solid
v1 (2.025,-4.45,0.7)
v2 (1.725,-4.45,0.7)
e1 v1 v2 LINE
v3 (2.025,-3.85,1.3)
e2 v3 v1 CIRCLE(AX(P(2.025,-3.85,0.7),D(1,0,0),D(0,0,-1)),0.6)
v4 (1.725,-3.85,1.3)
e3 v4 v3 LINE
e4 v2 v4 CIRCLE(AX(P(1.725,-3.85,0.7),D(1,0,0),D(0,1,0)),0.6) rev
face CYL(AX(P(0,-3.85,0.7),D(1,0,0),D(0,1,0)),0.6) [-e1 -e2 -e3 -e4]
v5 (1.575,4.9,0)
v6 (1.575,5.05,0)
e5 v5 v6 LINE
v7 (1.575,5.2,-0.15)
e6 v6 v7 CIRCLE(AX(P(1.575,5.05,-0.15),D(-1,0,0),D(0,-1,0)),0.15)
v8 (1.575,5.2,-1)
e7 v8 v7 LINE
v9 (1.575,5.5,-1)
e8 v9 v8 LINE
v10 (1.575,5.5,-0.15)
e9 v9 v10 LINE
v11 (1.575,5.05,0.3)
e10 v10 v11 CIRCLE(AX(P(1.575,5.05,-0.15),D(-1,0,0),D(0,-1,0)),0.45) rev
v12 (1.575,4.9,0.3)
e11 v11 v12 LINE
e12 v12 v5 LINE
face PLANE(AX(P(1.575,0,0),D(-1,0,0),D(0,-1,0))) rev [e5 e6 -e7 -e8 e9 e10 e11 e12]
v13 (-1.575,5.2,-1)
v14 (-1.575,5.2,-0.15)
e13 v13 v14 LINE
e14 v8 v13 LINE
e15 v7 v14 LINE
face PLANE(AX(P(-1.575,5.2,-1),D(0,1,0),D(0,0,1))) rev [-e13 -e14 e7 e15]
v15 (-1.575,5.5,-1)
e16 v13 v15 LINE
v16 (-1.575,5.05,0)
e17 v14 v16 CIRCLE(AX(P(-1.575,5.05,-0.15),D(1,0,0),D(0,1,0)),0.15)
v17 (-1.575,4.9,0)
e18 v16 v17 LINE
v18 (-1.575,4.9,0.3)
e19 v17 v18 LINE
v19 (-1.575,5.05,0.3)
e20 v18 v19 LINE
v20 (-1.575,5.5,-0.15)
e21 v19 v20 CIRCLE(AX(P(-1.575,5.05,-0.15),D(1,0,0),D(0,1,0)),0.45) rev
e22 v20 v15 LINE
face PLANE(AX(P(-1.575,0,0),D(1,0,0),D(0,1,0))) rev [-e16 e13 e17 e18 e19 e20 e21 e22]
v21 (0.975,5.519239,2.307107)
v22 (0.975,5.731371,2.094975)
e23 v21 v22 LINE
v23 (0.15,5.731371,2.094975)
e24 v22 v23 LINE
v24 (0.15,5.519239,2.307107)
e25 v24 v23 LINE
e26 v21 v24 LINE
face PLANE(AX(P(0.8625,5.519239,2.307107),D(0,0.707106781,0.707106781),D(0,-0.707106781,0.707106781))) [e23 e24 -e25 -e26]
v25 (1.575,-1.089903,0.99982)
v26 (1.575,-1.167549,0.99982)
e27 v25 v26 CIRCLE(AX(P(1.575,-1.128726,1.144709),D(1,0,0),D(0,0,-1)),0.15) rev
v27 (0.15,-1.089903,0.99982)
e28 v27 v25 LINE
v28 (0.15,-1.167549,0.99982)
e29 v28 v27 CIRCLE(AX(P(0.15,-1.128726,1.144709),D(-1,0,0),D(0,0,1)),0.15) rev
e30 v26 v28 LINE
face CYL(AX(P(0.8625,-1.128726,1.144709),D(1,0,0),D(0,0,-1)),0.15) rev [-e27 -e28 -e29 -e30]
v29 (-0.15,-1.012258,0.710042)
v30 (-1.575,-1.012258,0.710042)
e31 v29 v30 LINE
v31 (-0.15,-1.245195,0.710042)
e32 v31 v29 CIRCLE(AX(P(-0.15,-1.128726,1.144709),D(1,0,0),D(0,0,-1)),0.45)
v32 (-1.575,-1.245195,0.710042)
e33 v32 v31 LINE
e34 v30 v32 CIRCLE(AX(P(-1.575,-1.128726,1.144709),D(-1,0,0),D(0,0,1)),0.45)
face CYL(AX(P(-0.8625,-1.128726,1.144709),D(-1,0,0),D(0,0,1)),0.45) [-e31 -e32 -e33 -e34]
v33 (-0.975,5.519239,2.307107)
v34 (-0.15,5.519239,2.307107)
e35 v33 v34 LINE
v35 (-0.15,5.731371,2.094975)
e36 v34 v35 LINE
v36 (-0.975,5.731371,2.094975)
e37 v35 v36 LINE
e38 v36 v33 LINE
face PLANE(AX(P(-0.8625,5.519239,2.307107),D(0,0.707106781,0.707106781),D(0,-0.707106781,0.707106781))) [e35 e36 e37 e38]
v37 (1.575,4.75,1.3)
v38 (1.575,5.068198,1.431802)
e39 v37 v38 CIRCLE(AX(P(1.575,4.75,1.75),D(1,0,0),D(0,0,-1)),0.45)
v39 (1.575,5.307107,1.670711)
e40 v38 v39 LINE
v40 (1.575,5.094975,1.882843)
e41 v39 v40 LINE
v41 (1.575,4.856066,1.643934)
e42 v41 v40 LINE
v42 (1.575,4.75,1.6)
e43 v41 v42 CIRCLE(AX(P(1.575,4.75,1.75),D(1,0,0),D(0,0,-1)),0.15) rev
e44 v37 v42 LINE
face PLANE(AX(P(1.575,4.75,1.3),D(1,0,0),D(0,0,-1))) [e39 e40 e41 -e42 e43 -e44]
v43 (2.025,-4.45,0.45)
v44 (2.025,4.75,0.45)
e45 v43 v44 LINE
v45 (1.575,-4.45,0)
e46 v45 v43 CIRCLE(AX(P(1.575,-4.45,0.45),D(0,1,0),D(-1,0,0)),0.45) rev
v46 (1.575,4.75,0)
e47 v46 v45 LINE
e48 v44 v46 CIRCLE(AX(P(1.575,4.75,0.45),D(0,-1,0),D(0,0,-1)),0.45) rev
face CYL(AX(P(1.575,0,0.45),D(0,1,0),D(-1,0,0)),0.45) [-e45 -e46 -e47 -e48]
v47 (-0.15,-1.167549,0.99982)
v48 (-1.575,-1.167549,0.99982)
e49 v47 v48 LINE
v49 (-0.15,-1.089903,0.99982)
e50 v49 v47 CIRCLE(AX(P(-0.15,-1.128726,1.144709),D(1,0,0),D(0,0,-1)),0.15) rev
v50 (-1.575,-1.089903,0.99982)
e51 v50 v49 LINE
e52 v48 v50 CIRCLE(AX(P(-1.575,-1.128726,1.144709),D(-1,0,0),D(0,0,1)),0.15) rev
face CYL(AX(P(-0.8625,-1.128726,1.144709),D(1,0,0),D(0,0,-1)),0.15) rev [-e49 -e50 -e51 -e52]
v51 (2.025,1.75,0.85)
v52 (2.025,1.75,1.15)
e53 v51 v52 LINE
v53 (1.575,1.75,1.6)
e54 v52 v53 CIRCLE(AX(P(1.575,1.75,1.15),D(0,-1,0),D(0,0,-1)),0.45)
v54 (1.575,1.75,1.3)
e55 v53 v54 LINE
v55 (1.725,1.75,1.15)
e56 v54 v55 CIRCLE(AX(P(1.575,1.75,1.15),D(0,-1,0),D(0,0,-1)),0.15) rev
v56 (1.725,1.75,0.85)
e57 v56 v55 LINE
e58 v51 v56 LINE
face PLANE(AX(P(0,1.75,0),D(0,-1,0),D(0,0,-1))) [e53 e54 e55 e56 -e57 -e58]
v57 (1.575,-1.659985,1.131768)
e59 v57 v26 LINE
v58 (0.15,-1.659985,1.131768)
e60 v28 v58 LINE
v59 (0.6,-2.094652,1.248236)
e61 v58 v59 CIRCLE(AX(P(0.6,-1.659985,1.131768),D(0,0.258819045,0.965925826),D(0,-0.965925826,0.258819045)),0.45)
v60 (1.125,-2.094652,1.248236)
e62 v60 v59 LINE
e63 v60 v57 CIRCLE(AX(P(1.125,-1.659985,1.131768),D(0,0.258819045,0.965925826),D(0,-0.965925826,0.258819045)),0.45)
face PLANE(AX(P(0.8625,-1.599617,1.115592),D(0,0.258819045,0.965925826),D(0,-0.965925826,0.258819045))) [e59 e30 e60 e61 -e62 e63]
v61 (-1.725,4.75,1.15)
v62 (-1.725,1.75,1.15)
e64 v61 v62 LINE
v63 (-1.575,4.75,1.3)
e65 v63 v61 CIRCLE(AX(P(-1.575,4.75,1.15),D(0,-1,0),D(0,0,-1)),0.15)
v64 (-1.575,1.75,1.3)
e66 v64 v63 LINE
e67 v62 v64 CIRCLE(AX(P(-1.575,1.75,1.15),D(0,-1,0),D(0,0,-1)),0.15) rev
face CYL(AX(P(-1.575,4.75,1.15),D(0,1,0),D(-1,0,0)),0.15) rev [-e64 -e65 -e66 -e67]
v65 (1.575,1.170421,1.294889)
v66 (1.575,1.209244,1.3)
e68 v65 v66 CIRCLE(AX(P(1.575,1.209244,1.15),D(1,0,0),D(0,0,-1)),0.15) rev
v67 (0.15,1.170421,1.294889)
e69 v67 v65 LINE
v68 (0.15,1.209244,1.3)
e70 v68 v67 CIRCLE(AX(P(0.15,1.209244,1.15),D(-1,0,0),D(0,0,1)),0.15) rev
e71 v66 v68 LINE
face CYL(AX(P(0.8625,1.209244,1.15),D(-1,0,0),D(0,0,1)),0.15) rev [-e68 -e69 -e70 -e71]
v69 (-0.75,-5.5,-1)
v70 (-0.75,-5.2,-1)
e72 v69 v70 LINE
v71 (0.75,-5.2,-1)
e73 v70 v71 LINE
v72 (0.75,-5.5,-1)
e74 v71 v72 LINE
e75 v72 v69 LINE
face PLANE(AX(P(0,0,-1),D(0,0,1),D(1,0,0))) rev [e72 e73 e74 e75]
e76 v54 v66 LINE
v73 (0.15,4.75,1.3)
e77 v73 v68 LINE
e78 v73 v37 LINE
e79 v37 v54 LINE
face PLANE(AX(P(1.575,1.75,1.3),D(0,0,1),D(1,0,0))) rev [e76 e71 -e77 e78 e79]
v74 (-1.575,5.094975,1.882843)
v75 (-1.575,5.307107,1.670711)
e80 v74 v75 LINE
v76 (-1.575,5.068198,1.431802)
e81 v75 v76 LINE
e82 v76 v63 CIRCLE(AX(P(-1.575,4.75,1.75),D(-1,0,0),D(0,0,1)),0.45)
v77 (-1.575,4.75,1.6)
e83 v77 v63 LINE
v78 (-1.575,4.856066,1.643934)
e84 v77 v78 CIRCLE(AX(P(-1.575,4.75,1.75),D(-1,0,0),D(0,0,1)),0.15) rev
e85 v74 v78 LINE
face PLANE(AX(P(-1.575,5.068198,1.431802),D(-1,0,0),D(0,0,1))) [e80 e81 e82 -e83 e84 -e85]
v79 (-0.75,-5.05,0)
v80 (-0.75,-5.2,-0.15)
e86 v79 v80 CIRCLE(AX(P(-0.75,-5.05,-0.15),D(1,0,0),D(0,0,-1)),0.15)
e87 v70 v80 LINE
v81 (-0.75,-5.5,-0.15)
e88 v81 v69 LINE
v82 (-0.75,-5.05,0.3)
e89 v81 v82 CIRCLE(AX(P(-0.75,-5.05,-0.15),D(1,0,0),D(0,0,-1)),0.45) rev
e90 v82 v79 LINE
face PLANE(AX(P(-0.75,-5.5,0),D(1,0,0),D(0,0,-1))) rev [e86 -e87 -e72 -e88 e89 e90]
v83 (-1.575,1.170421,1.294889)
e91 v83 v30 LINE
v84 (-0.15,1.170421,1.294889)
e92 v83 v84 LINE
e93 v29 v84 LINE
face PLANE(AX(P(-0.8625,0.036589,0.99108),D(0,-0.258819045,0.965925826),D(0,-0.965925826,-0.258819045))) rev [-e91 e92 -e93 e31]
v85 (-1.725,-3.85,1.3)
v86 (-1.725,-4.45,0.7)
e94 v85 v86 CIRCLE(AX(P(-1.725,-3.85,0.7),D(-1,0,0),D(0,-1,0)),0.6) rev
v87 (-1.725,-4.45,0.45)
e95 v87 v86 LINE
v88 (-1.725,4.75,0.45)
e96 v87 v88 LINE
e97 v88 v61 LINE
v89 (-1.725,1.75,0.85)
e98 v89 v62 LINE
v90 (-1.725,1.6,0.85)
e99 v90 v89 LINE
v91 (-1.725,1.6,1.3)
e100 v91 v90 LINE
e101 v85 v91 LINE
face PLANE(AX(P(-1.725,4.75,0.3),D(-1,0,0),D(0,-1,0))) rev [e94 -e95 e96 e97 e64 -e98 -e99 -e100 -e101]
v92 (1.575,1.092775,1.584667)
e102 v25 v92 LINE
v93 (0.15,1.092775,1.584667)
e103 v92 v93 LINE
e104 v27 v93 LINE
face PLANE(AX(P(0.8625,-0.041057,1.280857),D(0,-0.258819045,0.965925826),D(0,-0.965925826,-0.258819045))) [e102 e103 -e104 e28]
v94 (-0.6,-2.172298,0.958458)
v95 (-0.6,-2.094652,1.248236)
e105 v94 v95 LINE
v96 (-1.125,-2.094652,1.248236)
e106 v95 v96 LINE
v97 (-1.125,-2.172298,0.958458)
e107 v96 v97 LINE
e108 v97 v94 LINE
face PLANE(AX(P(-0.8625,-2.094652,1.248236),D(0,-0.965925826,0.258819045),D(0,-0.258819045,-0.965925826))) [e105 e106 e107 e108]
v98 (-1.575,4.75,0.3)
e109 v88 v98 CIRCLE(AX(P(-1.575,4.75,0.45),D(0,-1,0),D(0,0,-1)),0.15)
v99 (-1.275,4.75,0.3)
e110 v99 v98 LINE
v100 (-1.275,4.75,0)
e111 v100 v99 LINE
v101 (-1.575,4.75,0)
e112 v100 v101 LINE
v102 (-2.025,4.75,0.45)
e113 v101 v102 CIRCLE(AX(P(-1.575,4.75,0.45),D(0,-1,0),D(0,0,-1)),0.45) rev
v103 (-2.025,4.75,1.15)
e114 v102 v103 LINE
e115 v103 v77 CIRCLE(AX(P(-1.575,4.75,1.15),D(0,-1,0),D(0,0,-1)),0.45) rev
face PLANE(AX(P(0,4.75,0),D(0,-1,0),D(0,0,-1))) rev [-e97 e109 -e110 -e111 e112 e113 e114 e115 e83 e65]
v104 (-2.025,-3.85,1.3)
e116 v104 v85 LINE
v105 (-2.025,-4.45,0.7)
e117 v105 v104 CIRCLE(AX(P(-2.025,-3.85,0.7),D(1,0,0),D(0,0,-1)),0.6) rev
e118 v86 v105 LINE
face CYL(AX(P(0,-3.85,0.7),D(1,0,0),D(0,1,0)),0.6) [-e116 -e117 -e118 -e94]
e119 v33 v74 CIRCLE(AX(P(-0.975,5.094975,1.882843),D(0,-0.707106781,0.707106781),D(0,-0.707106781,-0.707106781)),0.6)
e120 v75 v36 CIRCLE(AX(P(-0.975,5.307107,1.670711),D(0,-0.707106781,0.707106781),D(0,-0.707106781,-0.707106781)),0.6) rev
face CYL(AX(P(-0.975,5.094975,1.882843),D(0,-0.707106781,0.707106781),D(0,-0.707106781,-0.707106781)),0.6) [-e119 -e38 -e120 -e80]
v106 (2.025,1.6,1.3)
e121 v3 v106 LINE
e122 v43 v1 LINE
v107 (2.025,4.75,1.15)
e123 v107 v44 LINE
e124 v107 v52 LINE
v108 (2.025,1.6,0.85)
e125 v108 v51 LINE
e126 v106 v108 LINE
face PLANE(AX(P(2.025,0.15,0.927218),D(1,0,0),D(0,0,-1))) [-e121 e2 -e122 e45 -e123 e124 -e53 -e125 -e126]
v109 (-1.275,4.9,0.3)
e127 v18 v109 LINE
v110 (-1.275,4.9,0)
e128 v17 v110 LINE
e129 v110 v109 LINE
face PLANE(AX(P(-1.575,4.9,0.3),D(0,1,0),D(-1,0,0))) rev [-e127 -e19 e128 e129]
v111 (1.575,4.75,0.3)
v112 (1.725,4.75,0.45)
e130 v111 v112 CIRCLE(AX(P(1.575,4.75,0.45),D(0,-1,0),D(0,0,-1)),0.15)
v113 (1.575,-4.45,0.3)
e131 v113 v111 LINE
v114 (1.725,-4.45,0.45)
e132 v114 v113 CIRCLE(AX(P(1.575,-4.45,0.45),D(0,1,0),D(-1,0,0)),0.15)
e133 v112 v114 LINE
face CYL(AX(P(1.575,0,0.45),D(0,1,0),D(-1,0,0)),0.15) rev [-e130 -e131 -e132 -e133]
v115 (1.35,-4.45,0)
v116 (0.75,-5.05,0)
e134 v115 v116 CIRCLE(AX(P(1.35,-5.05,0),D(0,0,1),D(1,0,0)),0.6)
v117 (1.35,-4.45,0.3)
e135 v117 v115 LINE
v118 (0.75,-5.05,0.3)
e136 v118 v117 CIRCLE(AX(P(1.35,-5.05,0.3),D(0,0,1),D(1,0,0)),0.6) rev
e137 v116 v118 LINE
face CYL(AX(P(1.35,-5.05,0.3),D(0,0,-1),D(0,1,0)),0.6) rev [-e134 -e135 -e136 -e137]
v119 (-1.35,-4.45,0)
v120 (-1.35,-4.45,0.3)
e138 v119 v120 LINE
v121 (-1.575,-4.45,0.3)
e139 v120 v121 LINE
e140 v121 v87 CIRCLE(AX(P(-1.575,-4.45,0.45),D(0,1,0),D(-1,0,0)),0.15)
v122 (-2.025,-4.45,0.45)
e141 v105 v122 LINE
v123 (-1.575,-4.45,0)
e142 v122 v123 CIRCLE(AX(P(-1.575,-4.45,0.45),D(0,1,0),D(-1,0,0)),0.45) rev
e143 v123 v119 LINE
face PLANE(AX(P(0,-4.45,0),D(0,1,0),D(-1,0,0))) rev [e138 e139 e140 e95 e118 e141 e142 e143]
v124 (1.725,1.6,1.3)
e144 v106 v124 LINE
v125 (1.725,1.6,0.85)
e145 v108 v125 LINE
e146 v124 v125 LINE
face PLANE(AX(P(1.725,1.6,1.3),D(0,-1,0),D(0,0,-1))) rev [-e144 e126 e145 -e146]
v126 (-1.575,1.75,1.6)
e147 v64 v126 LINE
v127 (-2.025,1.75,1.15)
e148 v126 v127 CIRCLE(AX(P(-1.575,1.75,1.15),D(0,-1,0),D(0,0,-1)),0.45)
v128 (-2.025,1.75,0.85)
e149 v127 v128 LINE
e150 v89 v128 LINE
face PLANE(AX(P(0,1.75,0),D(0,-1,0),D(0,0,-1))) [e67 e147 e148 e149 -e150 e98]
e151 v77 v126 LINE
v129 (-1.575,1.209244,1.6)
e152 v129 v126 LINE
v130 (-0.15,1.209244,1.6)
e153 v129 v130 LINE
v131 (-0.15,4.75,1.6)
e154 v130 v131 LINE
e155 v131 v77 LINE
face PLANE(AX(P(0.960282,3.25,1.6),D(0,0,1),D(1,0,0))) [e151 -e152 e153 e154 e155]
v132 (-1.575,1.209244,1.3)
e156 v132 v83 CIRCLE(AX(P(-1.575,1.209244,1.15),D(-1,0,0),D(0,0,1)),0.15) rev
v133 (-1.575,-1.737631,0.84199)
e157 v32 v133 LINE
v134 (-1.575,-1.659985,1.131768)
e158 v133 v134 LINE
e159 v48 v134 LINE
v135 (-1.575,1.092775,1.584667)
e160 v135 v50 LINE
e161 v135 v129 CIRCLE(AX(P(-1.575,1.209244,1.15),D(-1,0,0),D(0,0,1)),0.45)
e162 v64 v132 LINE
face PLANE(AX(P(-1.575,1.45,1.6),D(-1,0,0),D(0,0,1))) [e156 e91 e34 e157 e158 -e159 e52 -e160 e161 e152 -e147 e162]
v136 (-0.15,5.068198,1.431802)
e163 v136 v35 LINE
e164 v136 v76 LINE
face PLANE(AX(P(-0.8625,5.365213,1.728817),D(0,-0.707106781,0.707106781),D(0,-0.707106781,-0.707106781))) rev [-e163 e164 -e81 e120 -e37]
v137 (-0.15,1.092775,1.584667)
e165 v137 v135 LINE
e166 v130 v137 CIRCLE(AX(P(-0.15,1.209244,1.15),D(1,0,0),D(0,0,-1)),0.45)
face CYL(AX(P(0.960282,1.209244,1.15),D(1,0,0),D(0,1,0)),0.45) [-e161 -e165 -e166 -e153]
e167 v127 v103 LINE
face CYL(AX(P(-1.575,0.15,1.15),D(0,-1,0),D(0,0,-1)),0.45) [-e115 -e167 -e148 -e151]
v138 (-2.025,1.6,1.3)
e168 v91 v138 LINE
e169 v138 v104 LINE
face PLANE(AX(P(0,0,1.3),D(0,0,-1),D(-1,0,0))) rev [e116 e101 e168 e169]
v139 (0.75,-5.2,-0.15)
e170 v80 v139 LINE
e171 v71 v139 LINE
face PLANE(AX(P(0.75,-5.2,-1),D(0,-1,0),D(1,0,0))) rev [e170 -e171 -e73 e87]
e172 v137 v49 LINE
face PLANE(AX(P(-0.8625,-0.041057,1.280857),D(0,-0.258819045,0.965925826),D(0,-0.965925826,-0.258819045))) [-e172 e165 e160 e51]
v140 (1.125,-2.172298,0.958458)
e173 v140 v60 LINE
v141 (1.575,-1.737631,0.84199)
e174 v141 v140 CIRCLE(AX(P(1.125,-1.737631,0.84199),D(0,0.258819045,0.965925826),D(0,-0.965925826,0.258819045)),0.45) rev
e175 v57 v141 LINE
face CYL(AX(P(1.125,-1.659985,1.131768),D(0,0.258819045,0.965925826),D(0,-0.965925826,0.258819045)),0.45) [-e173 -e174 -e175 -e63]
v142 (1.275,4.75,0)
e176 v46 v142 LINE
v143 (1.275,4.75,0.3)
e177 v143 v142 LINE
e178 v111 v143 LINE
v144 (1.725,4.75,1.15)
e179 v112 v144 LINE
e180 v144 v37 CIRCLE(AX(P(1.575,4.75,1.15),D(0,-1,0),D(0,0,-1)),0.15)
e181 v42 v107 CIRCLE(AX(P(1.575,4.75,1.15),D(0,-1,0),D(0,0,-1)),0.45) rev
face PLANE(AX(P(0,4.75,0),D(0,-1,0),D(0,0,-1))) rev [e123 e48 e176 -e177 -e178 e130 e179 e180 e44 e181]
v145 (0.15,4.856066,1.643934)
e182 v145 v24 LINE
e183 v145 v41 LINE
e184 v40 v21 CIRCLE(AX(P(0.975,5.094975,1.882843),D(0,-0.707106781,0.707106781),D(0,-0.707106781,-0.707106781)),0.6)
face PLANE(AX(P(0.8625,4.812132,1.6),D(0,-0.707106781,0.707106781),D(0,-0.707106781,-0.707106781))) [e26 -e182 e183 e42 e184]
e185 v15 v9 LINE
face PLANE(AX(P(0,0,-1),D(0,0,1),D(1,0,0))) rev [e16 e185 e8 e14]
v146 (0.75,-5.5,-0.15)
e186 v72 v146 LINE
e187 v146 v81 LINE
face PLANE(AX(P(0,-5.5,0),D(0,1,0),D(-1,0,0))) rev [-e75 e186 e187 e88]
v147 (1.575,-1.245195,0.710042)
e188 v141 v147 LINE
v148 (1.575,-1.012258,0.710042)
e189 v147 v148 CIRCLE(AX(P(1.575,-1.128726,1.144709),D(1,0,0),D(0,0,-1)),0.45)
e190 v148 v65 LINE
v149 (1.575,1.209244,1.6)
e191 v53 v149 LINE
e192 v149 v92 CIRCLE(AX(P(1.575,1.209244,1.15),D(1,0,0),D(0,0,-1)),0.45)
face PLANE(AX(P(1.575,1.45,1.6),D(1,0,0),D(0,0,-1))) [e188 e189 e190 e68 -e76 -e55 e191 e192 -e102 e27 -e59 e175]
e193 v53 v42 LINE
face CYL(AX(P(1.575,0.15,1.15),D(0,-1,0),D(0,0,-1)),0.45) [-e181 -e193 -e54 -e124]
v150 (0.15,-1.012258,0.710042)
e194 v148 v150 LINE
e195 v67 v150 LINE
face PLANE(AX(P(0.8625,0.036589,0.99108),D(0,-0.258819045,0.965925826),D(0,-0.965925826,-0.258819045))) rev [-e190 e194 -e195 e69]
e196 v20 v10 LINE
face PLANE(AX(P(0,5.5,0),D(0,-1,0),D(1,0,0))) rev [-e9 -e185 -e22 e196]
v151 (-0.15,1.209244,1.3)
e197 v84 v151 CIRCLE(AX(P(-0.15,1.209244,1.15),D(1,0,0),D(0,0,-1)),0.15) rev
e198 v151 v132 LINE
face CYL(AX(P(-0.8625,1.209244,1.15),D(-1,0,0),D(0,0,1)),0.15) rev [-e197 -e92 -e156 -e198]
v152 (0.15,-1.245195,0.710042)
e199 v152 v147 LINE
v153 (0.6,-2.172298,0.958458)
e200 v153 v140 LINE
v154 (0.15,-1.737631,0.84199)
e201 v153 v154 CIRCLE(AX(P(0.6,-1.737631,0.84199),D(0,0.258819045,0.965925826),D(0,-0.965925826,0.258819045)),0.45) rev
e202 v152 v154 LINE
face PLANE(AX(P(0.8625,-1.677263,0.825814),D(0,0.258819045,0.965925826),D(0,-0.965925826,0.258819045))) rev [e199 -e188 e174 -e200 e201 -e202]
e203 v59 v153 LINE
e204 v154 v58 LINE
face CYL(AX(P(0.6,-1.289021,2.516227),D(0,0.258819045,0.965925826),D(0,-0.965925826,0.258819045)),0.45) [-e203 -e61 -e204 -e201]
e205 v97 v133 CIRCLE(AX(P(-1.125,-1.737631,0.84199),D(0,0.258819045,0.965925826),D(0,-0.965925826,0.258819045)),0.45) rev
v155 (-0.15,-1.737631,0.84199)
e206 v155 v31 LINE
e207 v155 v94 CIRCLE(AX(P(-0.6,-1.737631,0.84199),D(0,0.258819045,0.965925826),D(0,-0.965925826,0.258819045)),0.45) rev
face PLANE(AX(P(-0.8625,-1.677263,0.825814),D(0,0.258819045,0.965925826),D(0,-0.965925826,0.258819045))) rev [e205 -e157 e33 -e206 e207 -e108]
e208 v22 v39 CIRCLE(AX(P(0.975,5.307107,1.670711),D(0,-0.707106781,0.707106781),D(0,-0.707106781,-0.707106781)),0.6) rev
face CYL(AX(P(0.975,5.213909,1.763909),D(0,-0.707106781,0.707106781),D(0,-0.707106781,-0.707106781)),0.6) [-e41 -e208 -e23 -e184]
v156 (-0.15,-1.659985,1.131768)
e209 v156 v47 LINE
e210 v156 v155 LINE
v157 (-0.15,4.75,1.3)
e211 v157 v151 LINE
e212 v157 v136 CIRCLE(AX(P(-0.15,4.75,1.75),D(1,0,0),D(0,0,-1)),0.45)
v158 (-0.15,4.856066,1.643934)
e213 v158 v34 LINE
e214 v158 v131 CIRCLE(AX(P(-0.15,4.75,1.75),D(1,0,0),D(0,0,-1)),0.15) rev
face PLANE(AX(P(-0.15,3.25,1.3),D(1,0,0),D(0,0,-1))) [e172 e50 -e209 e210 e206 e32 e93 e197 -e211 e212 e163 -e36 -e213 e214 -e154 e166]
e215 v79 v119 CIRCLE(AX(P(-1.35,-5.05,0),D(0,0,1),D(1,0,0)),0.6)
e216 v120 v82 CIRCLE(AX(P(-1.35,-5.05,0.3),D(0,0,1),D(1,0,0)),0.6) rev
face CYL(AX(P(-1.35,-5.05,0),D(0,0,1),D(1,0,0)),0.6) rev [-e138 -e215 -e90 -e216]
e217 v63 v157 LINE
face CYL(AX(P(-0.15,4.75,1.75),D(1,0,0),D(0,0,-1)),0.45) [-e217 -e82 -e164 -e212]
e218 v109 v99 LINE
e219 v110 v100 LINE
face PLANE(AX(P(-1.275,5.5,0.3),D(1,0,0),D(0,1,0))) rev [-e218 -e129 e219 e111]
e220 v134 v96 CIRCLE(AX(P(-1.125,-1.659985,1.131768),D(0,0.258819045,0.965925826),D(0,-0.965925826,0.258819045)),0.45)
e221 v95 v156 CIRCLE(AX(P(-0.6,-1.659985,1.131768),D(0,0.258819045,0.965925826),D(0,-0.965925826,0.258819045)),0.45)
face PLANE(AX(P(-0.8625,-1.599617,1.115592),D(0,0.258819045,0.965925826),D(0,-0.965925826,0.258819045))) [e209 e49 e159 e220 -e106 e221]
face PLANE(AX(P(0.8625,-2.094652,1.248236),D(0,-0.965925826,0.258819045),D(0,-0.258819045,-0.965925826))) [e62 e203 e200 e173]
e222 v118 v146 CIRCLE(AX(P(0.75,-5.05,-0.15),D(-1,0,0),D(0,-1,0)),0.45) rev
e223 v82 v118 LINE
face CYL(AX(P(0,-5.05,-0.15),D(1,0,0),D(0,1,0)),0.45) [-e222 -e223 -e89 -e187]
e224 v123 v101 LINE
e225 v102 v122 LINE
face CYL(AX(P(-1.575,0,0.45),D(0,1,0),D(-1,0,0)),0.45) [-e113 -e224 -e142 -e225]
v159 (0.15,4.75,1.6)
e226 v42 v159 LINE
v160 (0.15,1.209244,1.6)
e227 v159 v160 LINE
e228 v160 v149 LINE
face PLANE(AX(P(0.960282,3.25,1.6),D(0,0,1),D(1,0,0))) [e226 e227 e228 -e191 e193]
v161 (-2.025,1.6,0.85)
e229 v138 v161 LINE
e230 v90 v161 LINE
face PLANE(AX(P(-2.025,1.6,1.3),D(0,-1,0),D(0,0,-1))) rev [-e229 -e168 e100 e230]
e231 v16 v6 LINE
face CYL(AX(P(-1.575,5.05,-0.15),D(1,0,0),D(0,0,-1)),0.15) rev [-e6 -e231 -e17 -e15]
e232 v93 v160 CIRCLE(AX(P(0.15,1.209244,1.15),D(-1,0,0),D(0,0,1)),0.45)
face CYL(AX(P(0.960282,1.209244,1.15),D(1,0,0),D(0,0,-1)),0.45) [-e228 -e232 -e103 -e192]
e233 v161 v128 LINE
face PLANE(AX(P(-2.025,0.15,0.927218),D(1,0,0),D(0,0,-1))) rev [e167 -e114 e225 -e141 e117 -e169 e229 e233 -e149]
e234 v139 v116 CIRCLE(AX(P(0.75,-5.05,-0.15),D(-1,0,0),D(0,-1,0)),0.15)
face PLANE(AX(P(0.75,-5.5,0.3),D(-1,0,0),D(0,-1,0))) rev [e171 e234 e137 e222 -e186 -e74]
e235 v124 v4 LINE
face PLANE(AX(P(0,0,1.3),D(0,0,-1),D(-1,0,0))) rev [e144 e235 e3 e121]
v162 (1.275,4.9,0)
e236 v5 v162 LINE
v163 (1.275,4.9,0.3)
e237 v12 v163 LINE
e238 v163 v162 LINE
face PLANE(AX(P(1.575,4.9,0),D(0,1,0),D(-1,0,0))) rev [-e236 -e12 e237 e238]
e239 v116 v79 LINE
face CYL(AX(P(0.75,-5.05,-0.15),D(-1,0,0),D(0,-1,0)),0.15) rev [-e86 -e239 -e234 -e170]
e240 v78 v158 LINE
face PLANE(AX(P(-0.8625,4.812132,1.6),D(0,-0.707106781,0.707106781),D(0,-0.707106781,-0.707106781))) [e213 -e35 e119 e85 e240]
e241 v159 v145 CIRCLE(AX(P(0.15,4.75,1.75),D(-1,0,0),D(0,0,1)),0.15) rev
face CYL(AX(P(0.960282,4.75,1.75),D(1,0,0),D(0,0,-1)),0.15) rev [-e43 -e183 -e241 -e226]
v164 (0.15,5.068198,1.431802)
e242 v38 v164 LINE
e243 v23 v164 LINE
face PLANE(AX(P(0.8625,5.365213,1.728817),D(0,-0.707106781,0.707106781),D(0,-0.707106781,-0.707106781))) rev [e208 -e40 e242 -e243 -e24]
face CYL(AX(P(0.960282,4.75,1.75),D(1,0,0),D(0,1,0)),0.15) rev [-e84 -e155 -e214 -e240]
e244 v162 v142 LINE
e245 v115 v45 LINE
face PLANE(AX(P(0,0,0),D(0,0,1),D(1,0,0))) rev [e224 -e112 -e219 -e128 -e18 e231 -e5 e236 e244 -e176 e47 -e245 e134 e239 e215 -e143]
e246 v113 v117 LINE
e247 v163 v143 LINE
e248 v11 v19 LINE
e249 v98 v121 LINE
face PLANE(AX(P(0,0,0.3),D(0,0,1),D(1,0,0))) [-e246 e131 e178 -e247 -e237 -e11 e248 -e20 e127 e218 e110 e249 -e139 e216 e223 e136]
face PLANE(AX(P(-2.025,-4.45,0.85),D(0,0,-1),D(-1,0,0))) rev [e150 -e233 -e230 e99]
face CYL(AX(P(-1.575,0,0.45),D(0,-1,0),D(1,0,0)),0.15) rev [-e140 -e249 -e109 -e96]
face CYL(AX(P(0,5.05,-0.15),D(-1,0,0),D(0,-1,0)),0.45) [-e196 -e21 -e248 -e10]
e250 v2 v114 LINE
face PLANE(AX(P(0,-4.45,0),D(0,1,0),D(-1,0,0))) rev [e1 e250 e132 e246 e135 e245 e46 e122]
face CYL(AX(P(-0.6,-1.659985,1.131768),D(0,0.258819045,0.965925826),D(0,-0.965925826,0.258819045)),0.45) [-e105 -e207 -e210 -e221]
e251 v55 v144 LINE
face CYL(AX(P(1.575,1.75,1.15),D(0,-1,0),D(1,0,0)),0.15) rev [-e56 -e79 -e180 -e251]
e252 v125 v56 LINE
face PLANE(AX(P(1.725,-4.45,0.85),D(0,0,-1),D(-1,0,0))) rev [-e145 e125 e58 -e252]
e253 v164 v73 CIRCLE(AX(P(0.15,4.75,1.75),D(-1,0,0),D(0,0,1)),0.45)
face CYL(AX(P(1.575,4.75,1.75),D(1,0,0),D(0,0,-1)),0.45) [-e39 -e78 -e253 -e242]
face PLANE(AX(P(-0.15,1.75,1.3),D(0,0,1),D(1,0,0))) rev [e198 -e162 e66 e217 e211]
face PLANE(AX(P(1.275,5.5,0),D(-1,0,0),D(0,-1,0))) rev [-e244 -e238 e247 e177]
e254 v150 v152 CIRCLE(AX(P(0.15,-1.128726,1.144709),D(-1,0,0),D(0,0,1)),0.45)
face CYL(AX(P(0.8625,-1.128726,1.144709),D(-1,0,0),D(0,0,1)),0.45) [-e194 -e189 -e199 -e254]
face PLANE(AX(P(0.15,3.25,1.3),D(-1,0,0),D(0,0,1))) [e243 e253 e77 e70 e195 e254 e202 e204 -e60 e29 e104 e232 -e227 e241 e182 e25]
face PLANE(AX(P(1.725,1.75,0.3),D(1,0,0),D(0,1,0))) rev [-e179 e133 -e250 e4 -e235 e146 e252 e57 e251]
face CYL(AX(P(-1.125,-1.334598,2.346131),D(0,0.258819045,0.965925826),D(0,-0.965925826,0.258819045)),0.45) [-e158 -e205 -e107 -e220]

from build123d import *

# Parameters (mm, degrees)
CUT_EXTRUDE1_START     = -2.025
CUT_EXTRUDE1_OUTLINE_W = 3.186396103
CUT_EXTRUDE1_OUTLINE_H = 1.6
CUT_EXTRUDE1_DEPTH     = 4.05
CUT_EXTRUDE1_START_2   = -1.575
CUT_EXTRUDE1_2_DEPTH   = 1.425
CUT_EXTRUDE1_START_3   = 0.15
CUT_EXTRUDE1_3_DEPTH   = 1.425
SKETCH2_W              = 0.3
SKETCH2_H              = 3.186396103
CUT_EXTRUDE2_DEPTH     = 0.3
CUT_EXTRUDE3_DEPTH     = 0.186396103
SKETCH4_W              = 3.45
SKETCH4_H              = 3
CUT_EXTRUDE4_DEPTH     = 1
BOSS_EXTRUDE1_DEPTH    = 6.2
SKETCH6_W              = 2.55
SKETCH6_H              = 0.3
BOSS_EXTRUDE2_DEPTH    = 0.75
SKETCH7_W              = 0.3
SKETCH7_H              = 0.6
BOSS_EXTRUDE3_DEPTH    = 0.3
SKETCH8_W              = 0.3
SKETCH8_H              = 0.6
BOSS_EXTRUDE4_DEPTH    = 0.3
SKETCH9_W              = 3.15
SKETCH9_H              = 0.3
BOSS_EXTRUDE5_DEPTH    = 1
SKETCH10_W             = 0.3
SKETCH10_H             = 6.05
BOSS_EXTRUDE6_DEPTH    = 0.45
SKETCH11_W             = 1.5
SKETCH11_H             = 0.3
BOSS_EXTRUDE7_DEPTH    = 1.05
SKETCH12_W             = 1.5
SKETCH12_H             = 0.3
BOSS_EXTRUDE8_DEPTH    = 1
SKETCH13_W             = 0.3
SKETCH13_H             = 6.05
BOSS_EXTRUDE9_DEPTH    = 0.45
DRAFT1_ANGLE           = 45
DRAFT2_ANGLE           = 45
FILLET1_R              = 0.15
FILLET2_R              = 0.45
FILLET3_R              = 0.6


with BuildPart() as part:
    # Cut-Extrude1: read off the stored shape, not the designer's step
    # Cut-Extrude1 outline → Cut-Extrude1 (new body)
    with BuildSketch(Plane.YZ.offset(CUT_EXTRUDE1_START)):
        with Locations((3.343198051, 0.8)):
            Rectangle(CUT_EXTRUDE1_OUTLINE_W, CUT_EXTRUDE1_OUTLINE_H)
    extrude(amount=CUT_EXTRUDE1_DEPTH)

    # Cut-Extrude1 2 outline → Cut-Extrude1 2 (add)
    with BuildSketch(Plane.YZ.offset(CUT_EXTRUDE1_START_2)):
        Polygon((4.936396103, 1.6), (4.936396103, 1.3), (5.73137085, 2.094974747), (4.812132034, 3.014213562), (4.812132034, 1.6), align=None)
        Polygon((1.189495749, 1.3), (1.75, 1.3), (1.75, 1.6), (1.15, 1.6), (-1.128726234, 0.989417146), (-2.09465206, 1.248236191), (-2.172297774, 0.958458443), (-1.128726234, 0.678834292), align=None)
    extrude(amount=CUT_EXTRUDE1_2_DEPTH)

    # Cut-Extrude1 3 outline → Cut-Extrude1 3 (add)
    with BuildSketch(Plane.YZ.offset(CUT_EXTRUDE1_START_3)):
        Polygon((4.936396103, 1.6), (4.936396103, 1.3), (5.73137085, 2.094974747), (4.812132034, 3.014213562), (4.812132034, 1.6), align=None)
        Polygon((1.189495749, 1.3), (1.75, 1.3), (1.75, 1.6), (1.15, 1.6), (-1.128726234, 0.989417146), (-2.09465206, 1.248236191), (-2.172297774, 0.958458443), (-1.128726234, 0.678834292), align=None)
    extrude(amount=CUT_EXTRUDE1_3_DEPTH)

    # Sketch2 → Cut-Extrude2 (cut)
    with BuildSketch(Plane.XY.offset(1.6)):
        with Locations((0, 3.343198051)):
            Rectangle(SKETCH2_W, SKETCH2_H)
    extrude(amount=-CUT_EXTRUDE2_DEPTH, mode=Mode.SUBTRACT)

    # Sketch3 → Cut-Extrude3 (cut)
    with BuildSketch(Plane(origin=(0, 4.936396103, 0), x_dir=(-1, 0, 0), z_dir=(0, 1, 0))):
        Polygon((-1.575, 1.3), (-1.575, 1.6), (-2.025, 1.6), (-2.025, 0), (2.025, 0), (2.025, 1.6), (1.575, 1.6), (1.575, 1.3), (0.15, 1.3), (-0.15, 1.3), align=None)
    extrude(amount=-CUT_EXTRUDE3_DEPTH, mode=Mode.SUBTRACT)

    # Sketch4 → Cut-Extrude4 (cut)
    with BuildSketch(Plane.XY.offset(1.3)):
        with Locations((0, 3.25)):
            Rectangle(SKETCH4_W, SKETCH4_H)
    extrude(amount=-CUT_EXTRUDE4_DEPTH, mode=Mode.SUBTRACT)

    # Sketch5 → Boss-Extrude1 (add)
    with BuildSketch(Plane.XZ.offset(-1.75)):
        Polygon((-1.725, 0.85), (-1.725, 0.3), (1.725, 0.3), (1.725, 0.85), (2.025, 0.85), (2.025, 0), (-2.025, 0), (-2.025, 0.85), align=None)
    extrude(amount=BOSS_EXTRUDE1_DEPTH)

    # Sketch6 → Boss-Extrude2 (add)
    with BuildSketch(Plane(origin=(0, 4.75, 0), x_dir=(-1, 0, 0), z_dir=(0, 1, 0))):
        with Locations((0, 0.15)):
            Rectangle(SKETCH6_W, SKETCH6_H)
    extrude(amount=BOSS_EXTRUDE2_DEPTH)

    # Sketch7 → Boss-Extrude3 (add)
    with BuildSketch(Plane.ZY.offset(1.275)):
        with Locations((0.15, 5.2)):
            Rectangle(SKETCH7_W, SKETCH7_H)
    extrude(amount=BOSS_EXTRUDE3_DEPTH)

    # Sketch8 → Boss-Extrude4 (add)
    with BuildSketch(Plane(origin=(1.275, 0, 0), x_dir=(0, 0, -1), z_dir=(1, 0, 0))):
        with Locations((-0.15, 5.2)):
            Rectangle(SKETCH8_W, SKETCH8_H)
    extrude(amount=BOSS_EXTRUDE4_DEPTH)

    # Sketch9 → Boss-Extrude5 (add)
    with BuildSketch(Plane(origin=(0, 0, 0), x_dir=(-1, 0, 0), z_dir=(0, 0, -1))):
        with Locations((0, 5.35)):
            Rectangle(SKETCH9_W, SKETCH9_H)
    extrude(amount=BOSS_EXTRUDE5_DEPTH)

    # Sketch10 → Boss-Extrude6 (add)
    with BuildSketch(Plane.XY.offset(0.85)):
        with Locations((-1.875, -1.425)):
            Rectangle(SKETCH10_W, SKETCH10_H)
    extrude(amount=BOSS_EXTRUDE6_DEPTH)

    # Sketch11 → Boss-Extrude7 (add)
    with BuildSketch(Plane.XZ.offset(4.45)):
        with Locations((0, 0.15)):
            Rectangle(SKETCH11_W, SKETCH11_H)
    extrude(amount=BOSS_EXTRUDE7_DEPTH)

    # Sketch12 → Boss-Extrude8 (add)
    with BuildSketch(Plane(origin=(0, 0, 0), x_dir=(-1, 0, 0), z_dir=(0, 0, -1))):
        with Locations((0, -5.35)):
            Rectangle(SKETCH12_W, SKETCH12_H)
    extrude(amount=BOSS_EXTRUDE8_DEPTH)

    # Sketch13 → Boss-Extrude9 (add)
    with BuildSketch(Plane.XY.offset(0.85)):
        with Locations((1.875, -1.425)):
            Rectangle(SKETCH13_W, SKETCH13_H)
    extrude(amount=BOSS_EXTRUDE9_DEPTH)

    # Draft1
    draft1_faces = [part.faces().sort_by_distance(p)[0] for p in [
        (0.8625, 4.812132034, 2.307106781),
    ]]
    draft(draft1_faces, Plane(origin=(0.960282071, 3.25, 1.6), x_dir=(1, 0, 0), z_dir=(0, 0, 1)), DRAFT1_ANGLE)

    # Draft2
    draft2_faces = [part.faces().sort_by_distance(p)[0] for p in [
        (-0.8625, 4.812132034, 2.307106781),
    ]]
    draft(draft2_faces, Plane(origin=(0.960282071, 3.25, 1.6), x_dir=(1, 0, 0), z_dir=(0, 0, 1)), DRAFT2_ANGLE)

    # Fillet1
    fillet1_edges = [part.edges().sort_by_distance(p)[0] for p in [
        (1.725, 3.25, 1.3),
        (0.8625, 1.189495749, 1.3),
        (0, -5.2, 0),
        (-0.8625, 4.812132034, 1.6),
        (0, 5.2, 0),
        (-1.725, 0.15, 0.3),
        (-0.8625, -1.128726234, 0.989417146),
        (-1.725, 3.25, 1.3),
        (0.8625, 4.812132034, 1.6),
        (0.8625, -1.128726234, 0.989417146),
        (-0.8625, 1.189495749, 1.3),
        (1.725, 0.15, 0.3),
    ]]
    fillet(fillet1_edges, radius=FILLET1_R)

    # Fillet2
    fillet2_edges = [part.edges().sort_by_distance(p)[0] for p in [
        (-2.025, 3.25, 1.6),
        (1.575, -2.133474917, 1.103347317),
        (0.15, -2.133474917, 1.103347317),
        (0.8625, -1.128726234, 0.678834292),
        (-0.8625, 4.936396103, 1.3),
        (0, 5.5, 0.3),
        (-0.8625, 1.15, 1.6),
        (2.025, 3.25, 1.6),
        (-0.15, -2.133474917, 1.103347317),
        (-1.575, -2.133474917, 1.103347317),
        (2.025, 0.15, 0),
        (-2.025, 0.15, 0),
        (0, -5.5, 0.3),
        (-0.8625, -1.128726234, 0.678834292),
        (0.8625, 4.936396103, 1.3),
        (0.8625, 1.15, 1.6),
    ]]
    fillet(fillet2_edges, radius=FILLET2_R)

    # Fillet3
    fillet3_edges = [part.edges().sort_by_distance(p)[0] for p in [
        (1.575, 5.625304833, 2.201040764),
        (1.875, -4.45, 1.3),
        (-1.875, -4.45, 1.3),
        (-0.75, -4.45, 0.15),
        (-1.575, 5.625304833, 2.201040764),
        (0.75, -4.45, 0.15),
    ]]
    fillet(fillet3_edges, radius=FILLET3_R)


solid = part.part
